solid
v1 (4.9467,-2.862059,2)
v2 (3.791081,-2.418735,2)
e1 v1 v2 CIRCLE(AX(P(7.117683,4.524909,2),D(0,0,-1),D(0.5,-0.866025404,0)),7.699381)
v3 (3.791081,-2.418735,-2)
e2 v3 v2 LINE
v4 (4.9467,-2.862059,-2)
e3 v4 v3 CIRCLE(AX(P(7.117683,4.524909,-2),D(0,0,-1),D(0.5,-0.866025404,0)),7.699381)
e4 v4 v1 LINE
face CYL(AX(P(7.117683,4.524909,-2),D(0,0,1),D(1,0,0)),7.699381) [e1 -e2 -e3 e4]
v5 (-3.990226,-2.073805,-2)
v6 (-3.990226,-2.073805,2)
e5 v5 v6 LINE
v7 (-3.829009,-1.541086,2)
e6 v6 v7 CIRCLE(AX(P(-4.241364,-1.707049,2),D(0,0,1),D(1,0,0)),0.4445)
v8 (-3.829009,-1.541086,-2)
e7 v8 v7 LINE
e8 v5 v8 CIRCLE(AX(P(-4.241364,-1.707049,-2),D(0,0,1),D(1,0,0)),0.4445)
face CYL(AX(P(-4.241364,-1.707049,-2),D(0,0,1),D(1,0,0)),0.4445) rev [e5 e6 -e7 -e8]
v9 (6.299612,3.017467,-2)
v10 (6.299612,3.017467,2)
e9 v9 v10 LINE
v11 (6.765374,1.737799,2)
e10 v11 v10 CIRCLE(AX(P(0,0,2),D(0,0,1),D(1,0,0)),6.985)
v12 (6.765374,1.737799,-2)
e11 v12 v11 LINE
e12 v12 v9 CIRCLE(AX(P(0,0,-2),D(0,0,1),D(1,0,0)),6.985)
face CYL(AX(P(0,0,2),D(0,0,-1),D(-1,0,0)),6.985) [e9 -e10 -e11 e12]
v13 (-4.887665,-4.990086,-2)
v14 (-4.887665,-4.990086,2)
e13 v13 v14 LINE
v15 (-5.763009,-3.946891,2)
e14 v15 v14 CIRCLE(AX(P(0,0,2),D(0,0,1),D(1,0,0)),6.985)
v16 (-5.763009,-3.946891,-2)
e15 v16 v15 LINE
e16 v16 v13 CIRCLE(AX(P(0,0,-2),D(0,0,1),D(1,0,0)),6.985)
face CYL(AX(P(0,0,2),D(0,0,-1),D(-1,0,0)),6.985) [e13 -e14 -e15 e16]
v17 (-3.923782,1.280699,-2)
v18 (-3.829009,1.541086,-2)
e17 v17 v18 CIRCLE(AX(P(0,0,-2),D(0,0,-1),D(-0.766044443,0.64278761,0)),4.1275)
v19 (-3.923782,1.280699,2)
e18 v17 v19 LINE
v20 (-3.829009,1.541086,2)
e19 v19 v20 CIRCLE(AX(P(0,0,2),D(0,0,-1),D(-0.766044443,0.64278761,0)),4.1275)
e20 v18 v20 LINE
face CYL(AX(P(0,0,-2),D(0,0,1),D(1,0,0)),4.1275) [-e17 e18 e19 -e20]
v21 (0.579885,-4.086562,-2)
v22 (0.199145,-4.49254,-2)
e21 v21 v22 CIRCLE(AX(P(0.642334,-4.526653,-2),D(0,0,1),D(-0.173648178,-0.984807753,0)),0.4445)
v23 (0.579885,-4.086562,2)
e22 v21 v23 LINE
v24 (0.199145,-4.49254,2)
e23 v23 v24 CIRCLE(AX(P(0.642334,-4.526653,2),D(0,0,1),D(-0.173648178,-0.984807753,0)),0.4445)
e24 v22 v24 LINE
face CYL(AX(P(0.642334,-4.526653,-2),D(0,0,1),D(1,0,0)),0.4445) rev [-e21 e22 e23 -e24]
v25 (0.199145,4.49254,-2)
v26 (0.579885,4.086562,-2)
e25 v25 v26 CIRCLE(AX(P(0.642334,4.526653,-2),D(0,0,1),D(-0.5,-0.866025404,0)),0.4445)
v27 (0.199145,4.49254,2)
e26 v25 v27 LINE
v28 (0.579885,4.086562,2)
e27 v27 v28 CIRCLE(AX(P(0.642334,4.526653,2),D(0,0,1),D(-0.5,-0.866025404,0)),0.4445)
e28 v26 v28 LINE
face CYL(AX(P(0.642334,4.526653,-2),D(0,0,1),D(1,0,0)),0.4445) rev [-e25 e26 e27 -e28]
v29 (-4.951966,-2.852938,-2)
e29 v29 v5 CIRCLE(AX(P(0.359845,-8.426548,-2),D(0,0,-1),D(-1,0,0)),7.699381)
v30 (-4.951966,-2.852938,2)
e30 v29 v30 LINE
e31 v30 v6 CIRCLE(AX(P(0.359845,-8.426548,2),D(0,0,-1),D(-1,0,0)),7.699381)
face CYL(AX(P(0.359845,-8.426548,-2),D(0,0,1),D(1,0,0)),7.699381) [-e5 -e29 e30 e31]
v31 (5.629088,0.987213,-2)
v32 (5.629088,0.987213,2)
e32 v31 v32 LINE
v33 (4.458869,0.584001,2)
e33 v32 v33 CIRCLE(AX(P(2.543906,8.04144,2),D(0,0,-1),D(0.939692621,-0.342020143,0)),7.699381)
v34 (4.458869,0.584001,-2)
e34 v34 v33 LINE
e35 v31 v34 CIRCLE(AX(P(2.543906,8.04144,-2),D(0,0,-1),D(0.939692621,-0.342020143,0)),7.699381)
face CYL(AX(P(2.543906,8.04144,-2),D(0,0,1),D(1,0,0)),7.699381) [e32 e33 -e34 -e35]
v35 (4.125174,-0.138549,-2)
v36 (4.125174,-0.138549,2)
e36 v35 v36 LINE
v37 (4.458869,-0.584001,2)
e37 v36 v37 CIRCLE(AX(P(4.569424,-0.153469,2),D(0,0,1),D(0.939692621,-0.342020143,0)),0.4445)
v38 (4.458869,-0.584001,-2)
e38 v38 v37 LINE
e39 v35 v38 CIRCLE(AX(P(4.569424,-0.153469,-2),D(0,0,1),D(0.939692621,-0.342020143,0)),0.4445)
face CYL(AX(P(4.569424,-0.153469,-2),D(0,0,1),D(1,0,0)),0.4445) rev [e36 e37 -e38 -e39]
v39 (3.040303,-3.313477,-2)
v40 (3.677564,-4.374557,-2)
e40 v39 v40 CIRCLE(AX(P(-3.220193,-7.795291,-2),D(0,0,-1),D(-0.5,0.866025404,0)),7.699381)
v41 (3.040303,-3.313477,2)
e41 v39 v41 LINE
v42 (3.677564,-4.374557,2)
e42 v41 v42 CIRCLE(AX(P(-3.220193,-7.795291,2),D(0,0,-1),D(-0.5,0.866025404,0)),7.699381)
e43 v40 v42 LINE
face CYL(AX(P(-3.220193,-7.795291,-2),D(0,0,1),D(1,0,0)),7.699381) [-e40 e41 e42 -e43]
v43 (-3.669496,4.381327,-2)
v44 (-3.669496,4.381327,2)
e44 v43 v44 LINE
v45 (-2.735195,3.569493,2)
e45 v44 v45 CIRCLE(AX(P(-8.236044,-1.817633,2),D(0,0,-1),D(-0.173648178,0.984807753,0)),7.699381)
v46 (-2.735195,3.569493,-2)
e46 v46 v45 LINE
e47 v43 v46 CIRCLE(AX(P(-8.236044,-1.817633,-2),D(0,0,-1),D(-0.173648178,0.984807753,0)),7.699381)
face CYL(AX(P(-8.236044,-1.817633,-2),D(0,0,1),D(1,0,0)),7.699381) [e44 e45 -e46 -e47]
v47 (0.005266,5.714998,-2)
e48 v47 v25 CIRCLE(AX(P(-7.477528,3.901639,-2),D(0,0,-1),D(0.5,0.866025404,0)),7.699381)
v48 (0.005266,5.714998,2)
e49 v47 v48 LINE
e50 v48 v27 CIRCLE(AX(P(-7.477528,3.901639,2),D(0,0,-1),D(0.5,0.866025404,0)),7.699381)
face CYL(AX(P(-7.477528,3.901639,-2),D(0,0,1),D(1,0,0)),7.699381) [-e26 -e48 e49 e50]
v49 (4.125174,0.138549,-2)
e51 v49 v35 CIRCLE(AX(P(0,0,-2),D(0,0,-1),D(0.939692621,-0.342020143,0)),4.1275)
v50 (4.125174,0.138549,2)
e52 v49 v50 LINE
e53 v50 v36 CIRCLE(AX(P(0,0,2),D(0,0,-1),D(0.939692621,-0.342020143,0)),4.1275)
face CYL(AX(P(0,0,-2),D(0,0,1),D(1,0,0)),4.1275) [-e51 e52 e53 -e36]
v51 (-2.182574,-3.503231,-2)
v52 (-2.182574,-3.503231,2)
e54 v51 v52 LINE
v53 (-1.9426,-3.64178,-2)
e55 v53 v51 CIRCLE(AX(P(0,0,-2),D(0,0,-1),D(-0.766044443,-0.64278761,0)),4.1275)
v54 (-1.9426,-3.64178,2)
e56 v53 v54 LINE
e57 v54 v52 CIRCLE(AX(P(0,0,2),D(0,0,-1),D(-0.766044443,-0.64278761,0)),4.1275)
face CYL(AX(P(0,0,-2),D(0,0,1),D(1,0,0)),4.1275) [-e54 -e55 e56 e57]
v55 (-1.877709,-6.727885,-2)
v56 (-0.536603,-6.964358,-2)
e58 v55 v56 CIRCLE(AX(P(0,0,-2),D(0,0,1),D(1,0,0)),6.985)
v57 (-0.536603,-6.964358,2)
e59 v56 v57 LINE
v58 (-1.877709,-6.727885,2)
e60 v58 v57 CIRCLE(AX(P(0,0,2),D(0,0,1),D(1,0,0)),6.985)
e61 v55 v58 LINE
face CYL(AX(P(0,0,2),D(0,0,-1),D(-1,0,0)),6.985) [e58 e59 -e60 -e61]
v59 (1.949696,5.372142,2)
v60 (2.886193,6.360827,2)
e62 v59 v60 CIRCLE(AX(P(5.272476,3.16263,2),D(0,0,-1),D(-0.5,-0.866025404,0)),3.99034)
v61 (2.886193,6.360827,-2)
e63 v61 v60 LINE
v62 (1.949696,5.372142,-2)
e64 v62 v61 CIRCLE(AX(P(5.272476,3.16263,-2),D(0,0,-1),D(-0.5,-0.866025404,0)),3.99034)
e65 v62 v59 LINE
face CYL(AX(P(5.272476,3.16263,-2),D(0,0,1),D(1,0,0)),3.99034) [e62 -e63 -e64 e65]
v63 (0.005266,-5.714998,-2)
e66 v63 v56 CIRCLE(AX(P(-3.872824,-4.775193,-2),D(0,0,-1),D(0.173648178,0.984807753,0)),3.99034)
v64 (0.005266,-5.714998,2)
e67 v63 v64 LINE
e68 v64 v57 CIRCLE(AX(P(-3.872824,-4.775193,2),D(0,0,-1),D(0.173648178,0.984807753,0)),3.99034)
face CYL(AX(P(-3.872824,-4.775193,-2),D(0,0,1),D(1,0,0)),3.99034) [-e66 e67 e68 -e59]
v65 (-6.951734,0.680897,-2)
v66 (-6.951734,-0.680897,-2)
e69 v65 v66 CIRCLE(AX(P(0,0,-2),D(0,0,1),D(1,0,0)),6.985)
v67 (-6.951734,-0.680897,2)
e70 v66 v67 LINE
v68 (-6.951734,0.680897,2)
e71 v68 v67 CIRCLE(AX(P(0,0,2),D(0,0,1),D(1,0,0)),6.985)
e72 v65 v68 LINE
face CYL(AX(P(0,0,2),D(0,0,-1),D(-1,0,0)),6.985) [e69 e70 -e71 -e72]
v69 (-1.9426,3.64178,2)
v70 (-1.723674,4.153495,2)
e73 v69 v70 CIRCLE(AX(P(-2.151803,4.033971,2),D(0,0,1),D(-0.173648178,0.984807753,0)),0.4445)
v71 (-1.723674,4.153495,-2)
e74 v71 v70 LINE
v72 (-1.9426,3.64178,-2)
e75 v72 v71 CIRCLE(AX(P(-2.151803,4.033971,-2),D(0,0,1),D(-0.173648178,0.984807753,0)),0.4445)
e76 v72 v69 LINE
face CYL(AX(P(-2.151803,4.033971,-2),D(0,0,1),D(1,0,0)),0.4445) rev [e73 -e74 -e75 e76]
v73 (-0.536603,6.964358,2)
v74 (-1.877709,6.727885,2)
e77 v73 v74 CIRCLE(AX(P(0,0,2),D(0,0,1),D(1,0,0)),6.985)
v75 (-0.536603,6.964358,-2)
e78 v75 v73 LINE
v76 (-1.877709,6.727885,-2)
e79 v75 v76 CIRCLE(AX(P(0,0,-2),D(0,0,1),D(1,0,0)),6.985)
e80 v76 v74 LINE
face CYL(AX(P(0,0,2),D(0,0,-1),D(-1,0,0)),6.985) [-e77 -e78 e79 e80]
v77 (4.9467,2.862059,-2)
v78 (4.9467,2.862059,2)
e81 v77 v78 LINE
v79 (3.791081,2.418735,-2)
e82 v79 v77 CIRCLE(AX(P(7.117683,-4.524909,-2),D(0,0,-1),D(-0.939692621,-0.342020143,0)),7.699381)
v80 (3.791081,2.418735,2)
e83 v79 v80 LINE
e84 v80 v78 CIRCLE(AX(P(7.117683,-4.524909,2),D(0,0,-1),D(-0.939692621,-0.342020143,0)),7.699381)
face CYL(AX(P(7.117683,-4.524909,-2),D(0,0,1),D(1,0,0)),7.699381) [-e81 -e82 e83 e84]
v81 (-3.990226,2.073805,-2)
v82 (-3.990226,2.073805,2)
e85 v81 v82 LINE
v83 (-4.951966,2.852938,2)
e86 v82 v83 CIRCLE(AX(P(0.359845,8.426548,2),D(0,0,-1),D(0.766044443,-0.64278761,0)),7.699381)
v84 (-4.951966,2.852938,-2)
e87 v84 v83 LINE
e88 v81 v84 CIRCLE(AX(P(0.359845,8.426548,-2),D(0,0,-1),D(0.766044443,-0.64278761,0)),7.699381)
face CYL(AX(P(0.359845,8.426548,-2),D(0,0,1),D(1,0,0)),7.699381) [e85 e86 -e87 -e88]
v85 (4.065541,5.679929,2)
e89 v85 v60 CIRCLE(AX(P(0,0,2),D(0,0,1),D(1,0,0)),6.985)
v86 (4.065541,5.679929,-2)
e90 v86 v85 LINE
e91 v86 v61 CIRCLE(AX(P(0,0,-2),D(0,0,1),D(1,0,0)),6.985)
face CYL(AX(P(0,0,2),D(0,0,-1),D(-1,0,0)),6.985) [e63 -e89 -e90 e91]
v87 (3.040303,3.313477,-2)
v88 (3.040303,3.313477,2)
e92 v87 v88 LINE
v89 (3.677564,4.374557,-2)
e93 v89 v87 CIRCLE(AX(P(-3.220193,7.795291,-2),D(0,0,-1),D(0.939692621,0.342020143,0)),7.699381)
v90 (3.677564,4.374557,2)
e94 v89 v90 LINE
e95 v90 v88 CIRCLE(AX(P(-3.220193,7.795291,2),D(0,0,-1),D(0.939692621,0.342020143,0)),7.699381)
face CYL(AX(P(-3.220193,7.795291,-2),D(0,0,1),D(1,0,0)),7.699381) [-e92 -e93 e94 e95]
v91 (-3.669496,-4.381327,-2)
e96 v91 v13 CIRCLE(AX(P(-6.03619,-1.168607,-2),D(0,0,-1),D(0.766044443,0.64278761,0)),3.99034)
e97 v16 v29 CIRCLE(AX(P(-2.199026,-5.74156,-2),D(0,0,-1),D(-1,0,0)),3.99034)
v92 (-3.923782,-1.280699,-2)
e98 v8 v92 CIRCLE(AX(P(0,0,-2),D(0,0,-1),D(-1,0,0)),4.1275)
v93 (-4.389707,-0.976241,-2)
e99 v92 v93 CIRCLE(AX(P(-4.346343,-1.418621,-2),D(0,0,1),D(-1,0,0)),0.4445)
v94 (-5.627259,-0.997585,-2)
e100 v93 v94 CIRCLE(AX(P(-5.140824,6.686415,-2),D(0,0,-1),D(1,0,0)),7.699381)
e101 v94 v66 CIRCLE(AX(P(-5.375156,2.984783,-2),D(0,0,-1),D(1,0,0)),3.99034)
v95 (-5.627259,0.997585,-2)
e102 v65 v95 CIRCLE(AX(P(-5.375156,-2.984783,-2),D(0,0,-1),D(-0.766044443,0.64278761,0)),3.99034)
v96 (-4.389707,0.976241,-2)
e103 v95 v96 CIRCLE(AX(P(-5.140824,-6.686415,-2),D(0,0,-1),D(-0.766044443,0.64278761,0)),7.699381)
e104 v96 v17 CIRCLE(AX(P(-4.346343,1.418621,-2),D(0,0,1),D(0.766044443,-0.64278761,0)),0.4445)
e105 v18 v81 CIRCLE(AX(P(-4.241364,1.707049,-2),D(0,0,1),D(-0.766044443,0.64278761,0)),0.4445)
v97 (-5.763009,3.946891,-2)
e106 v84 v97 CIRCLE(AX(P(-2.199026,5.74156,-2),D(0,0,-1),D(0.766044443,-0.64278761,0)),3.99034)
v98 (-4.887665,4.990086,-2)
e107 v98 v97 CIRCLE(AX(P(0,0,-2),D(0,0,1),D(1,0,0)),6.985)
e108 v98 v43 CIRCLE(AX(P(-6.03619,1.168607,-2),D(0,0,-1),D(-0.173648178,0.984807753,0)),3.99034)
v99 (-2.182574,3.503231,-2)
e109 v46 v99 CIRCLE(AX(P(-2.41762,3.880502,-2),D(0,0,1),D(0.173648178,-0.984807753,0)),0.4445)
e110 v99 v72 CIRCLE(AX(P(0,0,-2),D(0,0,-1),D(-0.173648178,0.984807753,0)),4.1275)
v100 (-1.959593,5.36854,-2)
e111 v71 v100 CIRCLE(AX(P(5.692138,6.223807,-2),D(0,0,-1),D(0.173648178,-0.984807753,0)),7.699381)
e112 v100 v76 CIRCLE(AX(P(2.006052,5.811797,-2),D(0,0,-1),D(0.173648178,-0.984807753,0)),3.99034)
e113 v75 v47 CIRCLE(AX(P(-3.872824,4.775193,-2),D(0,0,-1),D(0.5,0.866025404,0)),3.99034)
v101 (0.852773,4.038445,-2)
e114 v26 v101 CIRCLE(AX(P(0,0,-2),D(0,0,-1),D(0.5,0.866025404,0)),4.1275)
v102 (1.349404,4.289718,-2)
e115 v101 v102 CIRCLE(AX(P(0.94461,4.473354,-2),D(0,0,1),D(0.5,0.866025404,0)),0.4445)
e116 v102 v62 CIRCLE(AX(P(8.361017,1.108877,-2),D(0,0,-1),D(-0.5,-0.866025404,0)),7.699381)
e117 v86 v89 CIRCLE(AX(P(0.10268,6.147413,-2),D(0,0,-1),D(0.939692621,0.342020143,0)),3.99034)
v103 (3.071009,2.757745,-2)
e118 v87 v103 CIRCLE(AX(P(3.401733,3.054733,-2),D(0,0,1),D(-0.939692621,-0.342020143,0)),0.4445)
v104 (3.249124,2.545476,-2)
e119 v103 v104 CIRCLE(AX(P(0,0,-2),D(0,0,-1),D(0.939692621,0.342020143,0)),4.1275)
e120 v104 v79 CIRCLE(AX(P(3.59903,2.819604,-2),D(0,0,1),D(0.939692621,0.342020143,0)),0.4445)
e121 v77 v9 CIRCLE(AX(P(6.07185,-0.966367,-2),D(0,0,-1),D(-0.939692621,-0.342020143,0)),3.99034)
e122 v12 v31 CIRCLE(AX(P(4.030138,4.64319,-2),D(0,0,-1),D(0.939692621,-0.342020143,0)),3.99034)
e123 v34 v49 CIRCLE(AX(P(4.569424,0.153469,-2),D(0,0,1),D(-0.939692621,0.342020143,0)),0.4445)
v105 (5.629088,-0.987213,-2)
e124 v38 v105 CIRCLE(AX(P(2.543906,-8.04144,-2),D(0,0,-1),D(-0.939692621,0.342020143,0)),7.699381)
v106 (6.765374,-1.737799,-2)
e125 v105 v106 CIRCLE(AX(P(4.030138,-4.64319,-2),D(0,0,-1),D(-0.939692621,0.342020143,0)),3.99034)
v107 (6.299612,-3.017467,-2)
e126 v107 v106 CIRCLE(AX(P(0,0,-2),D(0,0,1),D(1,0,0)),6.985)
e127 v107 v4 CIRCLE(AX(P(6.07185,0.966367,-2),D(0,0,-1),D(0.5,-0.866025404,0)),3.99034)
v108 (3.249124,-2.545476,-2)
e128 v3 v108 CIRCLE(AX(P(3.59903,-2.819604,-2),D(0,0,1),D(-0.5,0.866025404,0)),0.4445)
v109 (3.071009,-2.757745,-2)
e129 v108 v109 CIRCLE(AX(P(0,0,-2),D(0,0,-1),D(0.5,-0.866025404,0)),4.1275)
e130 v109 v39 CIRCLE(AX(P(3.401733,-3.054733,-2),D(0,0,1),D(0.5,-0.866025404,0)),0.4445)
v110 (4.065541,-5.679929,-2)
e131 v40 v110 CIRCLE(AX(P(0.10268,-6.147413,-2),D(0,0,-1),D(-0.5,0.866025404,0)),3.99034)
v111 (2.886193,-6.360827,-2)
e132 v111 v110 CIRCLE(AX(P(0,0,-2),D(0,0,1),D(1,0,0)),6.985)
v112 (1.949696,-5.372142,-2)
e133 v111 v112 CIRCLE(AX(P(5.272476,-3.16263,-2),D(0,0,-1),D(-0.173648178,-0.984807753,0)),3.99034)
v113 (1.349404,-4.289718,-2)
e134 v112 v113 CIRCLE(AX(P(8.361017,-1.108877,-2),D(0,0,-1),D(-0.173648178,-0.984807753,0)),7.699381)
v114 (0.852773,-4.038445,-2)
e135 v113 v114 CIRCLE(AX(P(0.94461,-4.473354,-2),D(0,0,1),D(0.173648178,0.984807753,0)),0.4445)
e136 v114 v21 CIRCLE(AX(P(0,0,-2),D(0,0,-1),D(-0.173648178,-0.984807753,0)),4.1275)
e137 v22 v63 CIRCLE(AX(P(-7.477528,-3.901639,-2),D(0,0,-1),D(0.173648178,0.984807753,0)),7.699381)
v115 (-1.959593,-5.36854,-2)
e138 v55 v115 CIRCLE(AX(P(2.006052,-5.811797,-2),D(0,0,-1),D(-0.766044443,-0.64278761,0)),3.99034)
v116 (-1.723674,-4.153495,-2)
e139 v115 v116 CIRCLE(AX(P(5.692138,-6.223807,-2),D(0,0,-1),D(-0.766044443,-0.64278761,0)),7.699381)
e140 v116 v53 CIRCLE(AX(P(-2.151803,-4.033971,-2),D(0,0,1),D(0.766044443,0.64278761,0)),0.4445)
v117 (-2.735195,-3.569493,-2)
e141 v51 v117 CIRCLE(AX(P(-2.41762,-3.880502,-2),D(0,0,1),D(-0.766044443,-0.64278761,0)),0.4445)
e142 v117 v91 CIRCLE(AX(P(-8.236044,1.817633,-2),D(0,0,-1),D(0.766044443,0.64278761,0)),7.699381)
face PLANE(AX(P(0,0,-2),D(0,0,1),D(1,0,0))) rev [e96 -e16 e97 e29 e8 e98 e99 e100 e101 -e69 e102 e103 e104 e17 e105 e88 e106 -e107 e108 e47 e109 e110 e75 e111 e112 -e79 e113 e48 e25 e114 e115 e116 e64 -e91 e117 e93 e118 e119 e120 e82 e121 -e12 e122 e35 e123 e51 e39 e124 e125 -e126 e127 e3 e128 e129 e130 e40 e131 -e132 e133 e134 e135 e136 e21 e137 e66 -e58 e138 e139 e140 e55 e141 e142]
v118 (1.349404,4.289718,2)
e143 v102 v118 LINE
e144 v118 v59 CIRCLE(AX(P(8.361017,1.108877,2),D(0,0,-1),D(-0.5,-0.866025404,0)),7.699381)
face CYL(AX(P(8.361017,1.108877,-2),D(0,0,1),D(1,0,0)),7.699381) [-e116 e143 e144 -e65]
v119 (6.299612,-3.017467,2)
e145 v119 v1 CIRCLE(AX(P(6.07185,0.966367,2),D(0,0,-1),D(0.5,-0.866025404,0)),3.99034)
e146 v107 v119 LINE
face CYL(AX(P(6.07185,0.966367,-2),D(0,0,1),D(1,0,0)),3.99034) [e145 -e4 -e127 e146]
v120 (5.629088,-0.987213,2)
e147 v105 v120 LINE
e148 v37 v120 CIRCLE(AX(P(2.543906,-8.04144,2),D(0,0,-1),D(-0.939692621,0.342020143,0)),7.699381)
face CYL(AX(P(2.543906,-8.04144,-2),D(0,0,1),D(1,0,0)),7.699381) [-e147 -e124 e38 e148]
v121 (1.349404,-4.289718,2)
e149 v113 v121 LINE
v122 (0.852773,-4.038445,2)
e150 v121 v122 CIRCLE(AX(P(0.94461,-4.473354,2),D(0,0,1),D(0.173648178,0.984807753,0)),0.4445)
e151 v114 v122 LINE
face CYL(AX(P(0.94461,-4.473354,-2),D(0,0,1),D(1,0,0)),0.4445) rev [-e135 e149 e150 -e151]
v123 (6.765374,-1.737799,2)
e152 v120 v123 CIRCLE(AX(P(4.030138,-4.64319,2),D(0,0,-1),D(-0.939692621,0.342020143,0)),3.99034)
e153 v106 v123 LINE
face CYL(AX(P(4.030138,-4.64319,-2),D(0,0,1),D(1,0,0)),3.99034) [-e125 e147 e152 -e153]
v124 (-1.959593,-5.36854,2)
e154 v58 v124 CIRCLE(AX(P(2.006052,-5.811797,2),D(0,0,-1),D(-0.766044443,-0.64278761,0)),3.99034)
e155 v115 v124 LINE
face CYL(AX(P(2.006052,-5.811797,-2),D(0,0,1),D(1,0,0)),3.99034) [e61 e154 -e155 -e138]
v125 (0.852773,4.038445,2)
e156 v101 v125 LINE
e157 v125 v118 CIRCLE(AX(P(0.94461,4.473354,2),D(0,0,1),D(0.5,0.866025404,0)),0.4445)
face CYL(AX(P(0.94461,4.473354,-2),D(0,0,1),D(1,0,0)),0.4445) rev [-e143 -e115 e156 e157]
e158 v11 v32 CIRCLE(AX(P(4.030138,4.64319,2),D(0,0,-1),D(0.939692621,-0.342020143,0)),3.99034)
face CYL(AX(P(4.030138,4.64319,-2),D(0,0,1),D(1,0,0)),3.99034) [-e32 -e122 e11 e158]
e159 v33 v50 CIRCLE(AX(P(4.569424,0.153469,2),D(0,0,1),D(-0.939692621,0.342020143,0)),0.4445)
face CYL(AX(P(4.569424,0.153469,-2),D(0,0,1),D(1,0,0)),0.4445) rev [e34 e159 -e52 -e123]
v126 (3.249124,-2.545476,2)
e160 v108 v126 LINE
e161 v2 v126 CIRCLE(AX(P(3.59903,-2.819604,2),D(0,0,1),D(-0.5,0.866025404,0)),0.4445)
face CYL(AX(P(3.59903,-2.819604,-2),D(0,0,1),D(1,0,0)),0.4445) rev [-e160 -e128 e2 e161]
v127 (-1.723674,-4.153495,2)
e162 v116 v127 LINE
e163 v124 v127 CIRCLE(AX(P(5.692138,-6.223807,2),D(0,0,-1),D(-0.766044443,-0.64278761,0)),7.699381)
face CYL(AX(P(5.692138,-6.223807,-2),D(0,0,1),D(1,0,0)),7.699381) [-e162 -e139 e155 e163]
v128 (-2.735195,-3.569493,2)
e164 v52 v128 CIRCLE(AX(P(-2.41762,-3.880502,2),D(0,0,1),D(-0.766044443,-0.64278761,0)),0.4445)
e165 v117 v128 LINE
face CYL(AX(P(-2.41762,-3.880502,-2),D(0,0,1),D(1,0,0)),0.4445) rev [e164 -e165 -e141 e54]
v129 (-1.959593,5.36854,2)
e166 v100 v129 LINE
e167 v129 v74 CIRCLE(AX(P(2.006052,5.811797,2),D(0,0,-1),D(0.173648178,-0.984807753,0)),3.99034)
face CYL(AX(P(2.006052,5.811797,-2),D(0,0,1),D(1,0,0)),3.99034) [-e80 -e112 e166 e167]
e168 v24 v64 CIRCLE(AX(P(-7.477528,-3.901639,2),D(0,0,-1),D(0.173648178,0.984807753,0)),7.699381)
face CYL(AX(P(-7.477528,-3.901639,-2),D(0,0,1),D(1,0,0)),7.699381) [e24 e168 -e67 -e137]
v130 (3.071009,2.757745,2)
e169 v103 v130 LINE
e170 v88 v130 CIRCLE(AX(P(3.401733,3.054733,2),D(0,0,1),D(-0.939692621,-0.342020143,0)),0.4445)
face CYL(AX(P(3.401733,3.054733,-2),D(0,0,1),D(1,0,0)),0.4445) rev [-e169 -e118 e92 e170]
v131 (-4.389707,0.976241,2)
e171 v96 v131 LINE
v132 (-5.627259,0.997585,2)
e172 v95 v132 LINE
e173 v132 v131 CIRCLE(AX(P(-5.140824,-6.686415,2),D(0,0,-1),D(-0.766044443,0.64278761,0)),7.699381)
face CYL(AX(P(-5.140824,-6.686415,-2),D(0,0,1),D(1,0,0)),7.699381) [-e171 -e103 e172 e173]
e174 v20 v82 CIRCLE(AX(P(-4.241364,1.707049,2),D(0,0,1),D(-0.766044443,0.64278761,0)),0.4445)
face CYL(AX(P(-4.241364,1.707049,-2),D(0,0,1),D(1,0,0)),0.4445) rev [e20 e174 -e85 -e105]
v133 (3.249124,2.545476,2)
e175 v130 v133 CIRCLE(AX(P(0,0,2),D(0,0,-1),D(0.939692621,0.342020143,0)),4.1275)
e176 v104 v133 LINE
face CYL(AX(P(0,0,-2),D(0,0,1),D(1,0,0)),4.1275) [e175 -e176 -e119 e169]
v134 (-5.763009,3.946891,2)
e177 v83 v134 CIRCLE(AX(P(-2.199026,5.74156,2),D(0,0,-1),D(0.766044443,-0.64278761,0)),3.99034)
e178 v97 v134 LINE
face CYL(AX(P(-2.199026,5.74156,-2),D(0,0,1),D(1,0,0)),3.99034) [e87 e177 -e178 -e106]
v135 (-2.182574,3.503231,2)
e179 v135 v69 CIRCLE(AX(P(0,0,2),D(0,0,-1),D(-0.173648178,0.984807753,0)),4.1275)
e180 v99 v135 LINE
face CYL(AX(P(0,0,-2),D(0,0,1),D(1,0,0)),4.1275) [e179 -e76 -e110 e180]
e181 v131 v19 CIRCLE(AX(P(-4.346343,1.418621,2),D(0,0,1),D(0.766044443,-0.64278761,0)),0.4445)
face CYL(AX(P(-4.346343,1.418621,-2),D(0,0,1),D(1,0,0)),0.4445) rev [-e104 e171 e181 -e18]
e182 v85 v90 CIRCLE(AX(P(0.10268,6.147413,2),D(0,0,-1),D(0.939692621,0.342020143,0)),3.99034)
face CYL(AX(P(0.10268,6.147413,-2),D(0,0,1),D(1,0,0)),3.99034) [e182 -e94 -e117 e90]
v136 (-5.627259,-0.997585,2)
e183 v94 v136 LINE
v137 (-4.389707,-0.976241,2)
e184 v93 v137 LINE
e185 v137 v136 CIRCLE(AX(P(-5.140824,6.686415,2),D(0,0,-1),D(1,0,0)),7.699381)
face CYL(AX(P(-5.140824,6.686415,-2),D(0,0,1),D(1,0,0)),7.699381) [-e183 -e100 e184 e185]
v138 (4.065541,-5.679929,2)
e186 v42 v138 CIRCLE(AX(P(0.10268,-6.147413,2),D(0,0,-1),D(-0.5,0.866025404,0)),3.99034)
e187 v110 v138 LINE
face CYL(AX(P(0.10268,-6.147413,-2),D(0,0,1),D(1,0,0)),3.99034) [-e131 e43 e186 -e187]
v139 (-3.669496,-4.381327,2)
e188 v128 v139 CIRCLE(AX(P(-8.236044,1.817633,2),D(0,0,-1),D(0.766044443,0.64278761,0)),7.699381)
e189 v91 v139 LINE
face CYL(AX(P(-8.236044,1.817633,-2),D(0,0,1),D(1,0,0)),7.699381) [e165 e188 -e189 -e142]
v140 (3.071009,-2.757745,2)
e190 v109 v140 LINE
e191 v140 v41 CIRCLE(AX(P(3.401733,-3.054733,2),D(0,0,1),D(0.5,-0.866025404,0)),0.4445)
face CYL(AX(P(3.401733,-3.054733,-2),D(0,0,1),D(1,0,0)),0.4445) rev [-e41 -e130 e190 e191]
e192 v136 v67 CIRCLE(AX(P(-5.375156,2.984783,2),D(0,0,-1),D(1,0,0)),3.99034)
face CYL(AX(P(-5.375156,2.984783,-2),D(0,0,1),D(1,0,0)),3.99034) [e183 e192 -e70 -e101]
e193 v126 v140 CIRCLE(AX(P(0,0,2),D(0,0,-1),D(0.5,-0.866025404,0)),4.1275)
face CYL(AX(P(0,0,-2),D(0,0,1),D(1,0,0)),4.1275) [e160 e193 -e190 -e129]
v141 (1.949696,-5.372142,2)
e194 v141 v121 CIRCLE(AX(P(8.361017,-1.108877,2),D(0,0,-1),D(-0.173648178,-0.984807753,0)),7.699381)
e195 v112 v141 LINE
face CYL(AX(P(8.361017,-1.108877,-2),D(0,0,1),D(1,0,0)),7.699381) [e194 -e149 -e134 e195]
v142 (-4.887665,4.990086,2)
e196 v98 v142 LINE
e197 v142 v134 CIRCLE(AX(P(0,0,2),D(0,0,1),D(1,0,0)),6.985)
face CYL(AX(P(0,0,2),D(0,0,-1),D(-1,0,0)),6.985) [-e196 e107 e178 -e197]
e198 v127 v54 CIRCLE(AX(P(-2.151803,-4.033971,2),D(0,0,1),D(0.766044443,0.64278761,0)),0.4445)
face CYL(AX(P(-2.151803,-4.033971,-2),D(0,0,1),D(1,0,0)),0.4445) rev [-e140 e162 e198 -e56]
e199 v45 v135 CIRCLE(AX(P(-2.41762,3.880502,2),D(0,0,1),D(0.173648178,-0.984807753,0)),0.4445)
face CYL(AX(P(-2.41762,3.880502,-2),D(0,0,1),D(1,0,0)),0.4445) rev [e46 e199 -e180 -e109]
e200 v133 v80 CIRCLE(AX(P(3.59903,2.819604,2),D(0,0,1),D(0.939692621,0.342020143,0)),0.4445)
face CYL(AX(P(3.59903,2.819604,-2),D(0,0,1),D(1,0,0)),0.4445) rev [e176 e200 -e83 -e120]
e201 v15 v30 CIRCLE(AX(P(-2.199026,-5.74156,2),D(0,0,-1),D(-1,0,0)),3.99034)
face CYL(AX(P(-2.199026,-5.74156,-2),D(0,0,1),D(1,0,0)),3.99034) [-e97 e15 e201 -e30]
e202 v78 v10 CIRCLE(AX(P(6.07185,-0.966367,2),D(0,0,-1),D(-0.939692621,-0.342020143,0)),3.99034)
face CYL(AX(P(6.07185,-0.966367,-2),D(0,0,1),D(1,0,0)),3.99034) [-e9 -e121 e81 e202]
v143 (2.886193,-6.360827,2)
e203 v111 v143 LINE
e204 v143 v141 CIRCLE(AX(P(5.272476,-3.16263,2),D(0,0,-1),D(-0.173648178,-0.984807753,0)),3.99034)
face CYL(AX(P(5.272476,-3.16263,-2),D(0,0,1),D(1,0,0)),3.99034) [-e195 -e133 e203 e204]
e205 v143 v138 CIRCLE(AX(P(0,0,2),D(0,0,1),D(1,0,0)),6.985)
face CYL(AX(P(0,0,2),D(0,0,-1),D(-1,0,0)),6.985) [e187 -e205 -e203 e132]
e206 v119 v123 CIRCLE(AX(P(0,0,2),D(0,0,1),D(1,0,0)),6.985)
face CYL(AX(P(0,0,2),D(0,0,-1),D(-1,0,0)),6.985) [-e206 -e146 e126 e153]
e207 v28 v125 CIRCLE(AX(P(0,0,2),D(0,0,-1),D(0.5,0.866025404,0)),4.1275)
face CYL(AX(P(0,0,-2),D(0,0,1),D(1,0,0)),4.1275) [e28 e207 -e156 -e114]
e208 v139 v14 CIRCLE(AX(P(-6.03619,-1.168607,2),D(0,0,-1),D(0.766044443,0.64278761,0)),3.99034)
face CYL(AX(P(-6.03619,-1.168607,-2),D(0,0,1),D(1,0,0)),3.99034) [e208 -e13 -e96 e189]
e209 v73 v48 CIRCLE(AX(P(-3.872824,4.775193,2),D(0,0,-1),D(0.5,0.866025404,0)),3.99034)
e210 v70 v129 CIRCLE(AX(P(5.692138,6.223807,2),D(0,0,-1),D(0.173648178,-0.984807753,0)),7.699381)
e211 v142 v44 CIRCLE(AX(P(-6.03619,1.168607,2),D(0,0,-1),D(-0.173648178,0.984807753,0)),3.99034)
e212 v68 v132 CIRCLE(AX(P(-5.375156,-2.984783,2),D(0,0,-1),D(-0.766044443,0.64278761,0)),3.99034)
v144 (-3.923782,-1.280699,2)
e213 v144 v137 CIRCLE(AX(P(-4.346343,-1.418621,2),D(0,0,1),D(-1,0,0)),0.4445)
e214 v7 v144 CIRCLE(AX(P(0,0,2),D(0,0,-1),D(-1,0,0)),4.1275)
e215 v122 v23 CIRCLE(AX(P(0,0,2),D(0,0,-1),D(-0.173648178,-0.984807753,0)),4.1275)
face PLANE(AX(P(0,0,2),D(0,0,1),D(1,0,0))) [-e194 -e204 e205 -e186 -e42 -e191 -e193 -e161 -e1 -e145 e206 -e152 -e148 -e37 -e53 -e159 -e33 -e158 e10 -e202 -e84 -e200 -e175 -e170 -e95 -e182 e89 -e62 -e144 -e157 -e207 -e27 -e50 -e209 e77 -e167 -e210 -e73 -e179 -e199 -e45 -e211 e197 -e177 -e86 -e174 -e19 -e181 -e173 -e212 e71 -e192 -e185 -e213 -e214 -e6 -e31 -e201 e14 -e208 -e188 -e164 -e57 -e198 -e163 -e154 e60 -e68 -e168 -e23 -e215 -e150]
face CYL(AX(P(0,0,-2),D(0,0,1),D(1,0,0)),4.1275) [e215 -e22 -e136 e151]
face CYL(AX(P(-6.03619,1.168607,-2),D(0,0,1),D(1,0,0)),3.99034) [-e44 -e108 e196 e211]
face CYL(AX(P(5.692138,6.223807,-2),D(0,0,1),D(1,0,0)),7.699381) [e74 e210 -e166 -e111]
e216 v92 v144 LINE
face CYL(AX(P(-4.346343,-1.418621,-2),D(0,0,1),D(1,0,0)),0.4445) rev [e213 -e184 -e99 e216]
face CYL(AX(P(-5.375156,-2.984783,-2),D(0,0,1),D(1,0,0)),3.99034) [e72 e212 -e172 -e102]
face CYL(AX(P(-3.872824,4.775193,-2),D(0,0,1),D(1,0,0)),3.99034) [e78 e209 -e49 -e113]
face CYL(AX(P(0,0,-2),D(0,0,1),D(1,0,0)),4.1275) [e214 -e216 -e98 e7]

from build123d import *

# Parameters (mm, degrees)
SKETCH1_R                = 6.985
BLANK_DISK_DEPTH         = 2.000000064
GEAR_TOOTH_CUT_DEPTH     = 11.657412961
GEAR_TEETH_REVOLVE_COUNT = 9


with BuildPart() as part:
    # Sketch1 → BLANK DISK (new, symmetric)
    with BuildSketch(Plane.XY):
        Circle(SKETCH1_R)
    extrude(amount=BLANK_DISK_DEPTH, both=True)

    # Sketch2 → GEAR TOOTH CUT (cut, through all)
    with BuildSketch(Plane.XY.offset(2.000000064)):
        with BuildLine():
            ThreePointArc((-5.763009467, -3.946890786), (-6.563752956, -2.389010701), (-6.951733872, -0.680897326))
            ThreePointArc((-6.951733872, -0.680897326), (-6.303106227, -0.89616004), (-5.627259472, -0.997585))
            ThreePointArc((-5.627259472, -0.997585), (-5.00805343, -1.01182167), (-4.389706578, -0.976241119))
            ThreePointArc((-4.389706578, -0.976241119), (-4.103194142, -1.046520353), (-3.923782009, -1.280699416))
            ThreePointArc((-3.923782009, -1.280699416), (-3.878581292, -1.411688142), (-3.82900912, -1.541085788))
            ThreePointArc((-3.82900912, -1.541085788), (-3.815919388, -1.835801253), (-3.990226026, -2.073804914))
            ThreePointArc((-3.990226026, -2.073804914), (-4.486777934, -2.444014326), (-4.951966126, -2.852938219))
            ThreePointArc((-4.951966126, -2.852938219), (-5.404500069, -3.365060167), (-5.763009467, -3.946890786))
        make_face()
    gear_tooth_cut = extrude(amount=-GEAR_TOOTH_CUT_DEPTH, mode=Mode.SUBTRACT)

    # GEAR TEETH REVOLVE: GEAR TOOTH CUT ×9 about axis
    gear_teeth_revolve_axis = Axis((0, 0, 50), (0, 0, -1))
    for i in range(1, GEAR_TEETH_REVOLVE_COUNT):
        add(gear_tooth_cut.rotate(gear_teeth_revolve_axis, i * 360 / GEAR_TEETH_REVOLVE_COUNT), mode=Mode.SUBTRACT)


solid = part.part
